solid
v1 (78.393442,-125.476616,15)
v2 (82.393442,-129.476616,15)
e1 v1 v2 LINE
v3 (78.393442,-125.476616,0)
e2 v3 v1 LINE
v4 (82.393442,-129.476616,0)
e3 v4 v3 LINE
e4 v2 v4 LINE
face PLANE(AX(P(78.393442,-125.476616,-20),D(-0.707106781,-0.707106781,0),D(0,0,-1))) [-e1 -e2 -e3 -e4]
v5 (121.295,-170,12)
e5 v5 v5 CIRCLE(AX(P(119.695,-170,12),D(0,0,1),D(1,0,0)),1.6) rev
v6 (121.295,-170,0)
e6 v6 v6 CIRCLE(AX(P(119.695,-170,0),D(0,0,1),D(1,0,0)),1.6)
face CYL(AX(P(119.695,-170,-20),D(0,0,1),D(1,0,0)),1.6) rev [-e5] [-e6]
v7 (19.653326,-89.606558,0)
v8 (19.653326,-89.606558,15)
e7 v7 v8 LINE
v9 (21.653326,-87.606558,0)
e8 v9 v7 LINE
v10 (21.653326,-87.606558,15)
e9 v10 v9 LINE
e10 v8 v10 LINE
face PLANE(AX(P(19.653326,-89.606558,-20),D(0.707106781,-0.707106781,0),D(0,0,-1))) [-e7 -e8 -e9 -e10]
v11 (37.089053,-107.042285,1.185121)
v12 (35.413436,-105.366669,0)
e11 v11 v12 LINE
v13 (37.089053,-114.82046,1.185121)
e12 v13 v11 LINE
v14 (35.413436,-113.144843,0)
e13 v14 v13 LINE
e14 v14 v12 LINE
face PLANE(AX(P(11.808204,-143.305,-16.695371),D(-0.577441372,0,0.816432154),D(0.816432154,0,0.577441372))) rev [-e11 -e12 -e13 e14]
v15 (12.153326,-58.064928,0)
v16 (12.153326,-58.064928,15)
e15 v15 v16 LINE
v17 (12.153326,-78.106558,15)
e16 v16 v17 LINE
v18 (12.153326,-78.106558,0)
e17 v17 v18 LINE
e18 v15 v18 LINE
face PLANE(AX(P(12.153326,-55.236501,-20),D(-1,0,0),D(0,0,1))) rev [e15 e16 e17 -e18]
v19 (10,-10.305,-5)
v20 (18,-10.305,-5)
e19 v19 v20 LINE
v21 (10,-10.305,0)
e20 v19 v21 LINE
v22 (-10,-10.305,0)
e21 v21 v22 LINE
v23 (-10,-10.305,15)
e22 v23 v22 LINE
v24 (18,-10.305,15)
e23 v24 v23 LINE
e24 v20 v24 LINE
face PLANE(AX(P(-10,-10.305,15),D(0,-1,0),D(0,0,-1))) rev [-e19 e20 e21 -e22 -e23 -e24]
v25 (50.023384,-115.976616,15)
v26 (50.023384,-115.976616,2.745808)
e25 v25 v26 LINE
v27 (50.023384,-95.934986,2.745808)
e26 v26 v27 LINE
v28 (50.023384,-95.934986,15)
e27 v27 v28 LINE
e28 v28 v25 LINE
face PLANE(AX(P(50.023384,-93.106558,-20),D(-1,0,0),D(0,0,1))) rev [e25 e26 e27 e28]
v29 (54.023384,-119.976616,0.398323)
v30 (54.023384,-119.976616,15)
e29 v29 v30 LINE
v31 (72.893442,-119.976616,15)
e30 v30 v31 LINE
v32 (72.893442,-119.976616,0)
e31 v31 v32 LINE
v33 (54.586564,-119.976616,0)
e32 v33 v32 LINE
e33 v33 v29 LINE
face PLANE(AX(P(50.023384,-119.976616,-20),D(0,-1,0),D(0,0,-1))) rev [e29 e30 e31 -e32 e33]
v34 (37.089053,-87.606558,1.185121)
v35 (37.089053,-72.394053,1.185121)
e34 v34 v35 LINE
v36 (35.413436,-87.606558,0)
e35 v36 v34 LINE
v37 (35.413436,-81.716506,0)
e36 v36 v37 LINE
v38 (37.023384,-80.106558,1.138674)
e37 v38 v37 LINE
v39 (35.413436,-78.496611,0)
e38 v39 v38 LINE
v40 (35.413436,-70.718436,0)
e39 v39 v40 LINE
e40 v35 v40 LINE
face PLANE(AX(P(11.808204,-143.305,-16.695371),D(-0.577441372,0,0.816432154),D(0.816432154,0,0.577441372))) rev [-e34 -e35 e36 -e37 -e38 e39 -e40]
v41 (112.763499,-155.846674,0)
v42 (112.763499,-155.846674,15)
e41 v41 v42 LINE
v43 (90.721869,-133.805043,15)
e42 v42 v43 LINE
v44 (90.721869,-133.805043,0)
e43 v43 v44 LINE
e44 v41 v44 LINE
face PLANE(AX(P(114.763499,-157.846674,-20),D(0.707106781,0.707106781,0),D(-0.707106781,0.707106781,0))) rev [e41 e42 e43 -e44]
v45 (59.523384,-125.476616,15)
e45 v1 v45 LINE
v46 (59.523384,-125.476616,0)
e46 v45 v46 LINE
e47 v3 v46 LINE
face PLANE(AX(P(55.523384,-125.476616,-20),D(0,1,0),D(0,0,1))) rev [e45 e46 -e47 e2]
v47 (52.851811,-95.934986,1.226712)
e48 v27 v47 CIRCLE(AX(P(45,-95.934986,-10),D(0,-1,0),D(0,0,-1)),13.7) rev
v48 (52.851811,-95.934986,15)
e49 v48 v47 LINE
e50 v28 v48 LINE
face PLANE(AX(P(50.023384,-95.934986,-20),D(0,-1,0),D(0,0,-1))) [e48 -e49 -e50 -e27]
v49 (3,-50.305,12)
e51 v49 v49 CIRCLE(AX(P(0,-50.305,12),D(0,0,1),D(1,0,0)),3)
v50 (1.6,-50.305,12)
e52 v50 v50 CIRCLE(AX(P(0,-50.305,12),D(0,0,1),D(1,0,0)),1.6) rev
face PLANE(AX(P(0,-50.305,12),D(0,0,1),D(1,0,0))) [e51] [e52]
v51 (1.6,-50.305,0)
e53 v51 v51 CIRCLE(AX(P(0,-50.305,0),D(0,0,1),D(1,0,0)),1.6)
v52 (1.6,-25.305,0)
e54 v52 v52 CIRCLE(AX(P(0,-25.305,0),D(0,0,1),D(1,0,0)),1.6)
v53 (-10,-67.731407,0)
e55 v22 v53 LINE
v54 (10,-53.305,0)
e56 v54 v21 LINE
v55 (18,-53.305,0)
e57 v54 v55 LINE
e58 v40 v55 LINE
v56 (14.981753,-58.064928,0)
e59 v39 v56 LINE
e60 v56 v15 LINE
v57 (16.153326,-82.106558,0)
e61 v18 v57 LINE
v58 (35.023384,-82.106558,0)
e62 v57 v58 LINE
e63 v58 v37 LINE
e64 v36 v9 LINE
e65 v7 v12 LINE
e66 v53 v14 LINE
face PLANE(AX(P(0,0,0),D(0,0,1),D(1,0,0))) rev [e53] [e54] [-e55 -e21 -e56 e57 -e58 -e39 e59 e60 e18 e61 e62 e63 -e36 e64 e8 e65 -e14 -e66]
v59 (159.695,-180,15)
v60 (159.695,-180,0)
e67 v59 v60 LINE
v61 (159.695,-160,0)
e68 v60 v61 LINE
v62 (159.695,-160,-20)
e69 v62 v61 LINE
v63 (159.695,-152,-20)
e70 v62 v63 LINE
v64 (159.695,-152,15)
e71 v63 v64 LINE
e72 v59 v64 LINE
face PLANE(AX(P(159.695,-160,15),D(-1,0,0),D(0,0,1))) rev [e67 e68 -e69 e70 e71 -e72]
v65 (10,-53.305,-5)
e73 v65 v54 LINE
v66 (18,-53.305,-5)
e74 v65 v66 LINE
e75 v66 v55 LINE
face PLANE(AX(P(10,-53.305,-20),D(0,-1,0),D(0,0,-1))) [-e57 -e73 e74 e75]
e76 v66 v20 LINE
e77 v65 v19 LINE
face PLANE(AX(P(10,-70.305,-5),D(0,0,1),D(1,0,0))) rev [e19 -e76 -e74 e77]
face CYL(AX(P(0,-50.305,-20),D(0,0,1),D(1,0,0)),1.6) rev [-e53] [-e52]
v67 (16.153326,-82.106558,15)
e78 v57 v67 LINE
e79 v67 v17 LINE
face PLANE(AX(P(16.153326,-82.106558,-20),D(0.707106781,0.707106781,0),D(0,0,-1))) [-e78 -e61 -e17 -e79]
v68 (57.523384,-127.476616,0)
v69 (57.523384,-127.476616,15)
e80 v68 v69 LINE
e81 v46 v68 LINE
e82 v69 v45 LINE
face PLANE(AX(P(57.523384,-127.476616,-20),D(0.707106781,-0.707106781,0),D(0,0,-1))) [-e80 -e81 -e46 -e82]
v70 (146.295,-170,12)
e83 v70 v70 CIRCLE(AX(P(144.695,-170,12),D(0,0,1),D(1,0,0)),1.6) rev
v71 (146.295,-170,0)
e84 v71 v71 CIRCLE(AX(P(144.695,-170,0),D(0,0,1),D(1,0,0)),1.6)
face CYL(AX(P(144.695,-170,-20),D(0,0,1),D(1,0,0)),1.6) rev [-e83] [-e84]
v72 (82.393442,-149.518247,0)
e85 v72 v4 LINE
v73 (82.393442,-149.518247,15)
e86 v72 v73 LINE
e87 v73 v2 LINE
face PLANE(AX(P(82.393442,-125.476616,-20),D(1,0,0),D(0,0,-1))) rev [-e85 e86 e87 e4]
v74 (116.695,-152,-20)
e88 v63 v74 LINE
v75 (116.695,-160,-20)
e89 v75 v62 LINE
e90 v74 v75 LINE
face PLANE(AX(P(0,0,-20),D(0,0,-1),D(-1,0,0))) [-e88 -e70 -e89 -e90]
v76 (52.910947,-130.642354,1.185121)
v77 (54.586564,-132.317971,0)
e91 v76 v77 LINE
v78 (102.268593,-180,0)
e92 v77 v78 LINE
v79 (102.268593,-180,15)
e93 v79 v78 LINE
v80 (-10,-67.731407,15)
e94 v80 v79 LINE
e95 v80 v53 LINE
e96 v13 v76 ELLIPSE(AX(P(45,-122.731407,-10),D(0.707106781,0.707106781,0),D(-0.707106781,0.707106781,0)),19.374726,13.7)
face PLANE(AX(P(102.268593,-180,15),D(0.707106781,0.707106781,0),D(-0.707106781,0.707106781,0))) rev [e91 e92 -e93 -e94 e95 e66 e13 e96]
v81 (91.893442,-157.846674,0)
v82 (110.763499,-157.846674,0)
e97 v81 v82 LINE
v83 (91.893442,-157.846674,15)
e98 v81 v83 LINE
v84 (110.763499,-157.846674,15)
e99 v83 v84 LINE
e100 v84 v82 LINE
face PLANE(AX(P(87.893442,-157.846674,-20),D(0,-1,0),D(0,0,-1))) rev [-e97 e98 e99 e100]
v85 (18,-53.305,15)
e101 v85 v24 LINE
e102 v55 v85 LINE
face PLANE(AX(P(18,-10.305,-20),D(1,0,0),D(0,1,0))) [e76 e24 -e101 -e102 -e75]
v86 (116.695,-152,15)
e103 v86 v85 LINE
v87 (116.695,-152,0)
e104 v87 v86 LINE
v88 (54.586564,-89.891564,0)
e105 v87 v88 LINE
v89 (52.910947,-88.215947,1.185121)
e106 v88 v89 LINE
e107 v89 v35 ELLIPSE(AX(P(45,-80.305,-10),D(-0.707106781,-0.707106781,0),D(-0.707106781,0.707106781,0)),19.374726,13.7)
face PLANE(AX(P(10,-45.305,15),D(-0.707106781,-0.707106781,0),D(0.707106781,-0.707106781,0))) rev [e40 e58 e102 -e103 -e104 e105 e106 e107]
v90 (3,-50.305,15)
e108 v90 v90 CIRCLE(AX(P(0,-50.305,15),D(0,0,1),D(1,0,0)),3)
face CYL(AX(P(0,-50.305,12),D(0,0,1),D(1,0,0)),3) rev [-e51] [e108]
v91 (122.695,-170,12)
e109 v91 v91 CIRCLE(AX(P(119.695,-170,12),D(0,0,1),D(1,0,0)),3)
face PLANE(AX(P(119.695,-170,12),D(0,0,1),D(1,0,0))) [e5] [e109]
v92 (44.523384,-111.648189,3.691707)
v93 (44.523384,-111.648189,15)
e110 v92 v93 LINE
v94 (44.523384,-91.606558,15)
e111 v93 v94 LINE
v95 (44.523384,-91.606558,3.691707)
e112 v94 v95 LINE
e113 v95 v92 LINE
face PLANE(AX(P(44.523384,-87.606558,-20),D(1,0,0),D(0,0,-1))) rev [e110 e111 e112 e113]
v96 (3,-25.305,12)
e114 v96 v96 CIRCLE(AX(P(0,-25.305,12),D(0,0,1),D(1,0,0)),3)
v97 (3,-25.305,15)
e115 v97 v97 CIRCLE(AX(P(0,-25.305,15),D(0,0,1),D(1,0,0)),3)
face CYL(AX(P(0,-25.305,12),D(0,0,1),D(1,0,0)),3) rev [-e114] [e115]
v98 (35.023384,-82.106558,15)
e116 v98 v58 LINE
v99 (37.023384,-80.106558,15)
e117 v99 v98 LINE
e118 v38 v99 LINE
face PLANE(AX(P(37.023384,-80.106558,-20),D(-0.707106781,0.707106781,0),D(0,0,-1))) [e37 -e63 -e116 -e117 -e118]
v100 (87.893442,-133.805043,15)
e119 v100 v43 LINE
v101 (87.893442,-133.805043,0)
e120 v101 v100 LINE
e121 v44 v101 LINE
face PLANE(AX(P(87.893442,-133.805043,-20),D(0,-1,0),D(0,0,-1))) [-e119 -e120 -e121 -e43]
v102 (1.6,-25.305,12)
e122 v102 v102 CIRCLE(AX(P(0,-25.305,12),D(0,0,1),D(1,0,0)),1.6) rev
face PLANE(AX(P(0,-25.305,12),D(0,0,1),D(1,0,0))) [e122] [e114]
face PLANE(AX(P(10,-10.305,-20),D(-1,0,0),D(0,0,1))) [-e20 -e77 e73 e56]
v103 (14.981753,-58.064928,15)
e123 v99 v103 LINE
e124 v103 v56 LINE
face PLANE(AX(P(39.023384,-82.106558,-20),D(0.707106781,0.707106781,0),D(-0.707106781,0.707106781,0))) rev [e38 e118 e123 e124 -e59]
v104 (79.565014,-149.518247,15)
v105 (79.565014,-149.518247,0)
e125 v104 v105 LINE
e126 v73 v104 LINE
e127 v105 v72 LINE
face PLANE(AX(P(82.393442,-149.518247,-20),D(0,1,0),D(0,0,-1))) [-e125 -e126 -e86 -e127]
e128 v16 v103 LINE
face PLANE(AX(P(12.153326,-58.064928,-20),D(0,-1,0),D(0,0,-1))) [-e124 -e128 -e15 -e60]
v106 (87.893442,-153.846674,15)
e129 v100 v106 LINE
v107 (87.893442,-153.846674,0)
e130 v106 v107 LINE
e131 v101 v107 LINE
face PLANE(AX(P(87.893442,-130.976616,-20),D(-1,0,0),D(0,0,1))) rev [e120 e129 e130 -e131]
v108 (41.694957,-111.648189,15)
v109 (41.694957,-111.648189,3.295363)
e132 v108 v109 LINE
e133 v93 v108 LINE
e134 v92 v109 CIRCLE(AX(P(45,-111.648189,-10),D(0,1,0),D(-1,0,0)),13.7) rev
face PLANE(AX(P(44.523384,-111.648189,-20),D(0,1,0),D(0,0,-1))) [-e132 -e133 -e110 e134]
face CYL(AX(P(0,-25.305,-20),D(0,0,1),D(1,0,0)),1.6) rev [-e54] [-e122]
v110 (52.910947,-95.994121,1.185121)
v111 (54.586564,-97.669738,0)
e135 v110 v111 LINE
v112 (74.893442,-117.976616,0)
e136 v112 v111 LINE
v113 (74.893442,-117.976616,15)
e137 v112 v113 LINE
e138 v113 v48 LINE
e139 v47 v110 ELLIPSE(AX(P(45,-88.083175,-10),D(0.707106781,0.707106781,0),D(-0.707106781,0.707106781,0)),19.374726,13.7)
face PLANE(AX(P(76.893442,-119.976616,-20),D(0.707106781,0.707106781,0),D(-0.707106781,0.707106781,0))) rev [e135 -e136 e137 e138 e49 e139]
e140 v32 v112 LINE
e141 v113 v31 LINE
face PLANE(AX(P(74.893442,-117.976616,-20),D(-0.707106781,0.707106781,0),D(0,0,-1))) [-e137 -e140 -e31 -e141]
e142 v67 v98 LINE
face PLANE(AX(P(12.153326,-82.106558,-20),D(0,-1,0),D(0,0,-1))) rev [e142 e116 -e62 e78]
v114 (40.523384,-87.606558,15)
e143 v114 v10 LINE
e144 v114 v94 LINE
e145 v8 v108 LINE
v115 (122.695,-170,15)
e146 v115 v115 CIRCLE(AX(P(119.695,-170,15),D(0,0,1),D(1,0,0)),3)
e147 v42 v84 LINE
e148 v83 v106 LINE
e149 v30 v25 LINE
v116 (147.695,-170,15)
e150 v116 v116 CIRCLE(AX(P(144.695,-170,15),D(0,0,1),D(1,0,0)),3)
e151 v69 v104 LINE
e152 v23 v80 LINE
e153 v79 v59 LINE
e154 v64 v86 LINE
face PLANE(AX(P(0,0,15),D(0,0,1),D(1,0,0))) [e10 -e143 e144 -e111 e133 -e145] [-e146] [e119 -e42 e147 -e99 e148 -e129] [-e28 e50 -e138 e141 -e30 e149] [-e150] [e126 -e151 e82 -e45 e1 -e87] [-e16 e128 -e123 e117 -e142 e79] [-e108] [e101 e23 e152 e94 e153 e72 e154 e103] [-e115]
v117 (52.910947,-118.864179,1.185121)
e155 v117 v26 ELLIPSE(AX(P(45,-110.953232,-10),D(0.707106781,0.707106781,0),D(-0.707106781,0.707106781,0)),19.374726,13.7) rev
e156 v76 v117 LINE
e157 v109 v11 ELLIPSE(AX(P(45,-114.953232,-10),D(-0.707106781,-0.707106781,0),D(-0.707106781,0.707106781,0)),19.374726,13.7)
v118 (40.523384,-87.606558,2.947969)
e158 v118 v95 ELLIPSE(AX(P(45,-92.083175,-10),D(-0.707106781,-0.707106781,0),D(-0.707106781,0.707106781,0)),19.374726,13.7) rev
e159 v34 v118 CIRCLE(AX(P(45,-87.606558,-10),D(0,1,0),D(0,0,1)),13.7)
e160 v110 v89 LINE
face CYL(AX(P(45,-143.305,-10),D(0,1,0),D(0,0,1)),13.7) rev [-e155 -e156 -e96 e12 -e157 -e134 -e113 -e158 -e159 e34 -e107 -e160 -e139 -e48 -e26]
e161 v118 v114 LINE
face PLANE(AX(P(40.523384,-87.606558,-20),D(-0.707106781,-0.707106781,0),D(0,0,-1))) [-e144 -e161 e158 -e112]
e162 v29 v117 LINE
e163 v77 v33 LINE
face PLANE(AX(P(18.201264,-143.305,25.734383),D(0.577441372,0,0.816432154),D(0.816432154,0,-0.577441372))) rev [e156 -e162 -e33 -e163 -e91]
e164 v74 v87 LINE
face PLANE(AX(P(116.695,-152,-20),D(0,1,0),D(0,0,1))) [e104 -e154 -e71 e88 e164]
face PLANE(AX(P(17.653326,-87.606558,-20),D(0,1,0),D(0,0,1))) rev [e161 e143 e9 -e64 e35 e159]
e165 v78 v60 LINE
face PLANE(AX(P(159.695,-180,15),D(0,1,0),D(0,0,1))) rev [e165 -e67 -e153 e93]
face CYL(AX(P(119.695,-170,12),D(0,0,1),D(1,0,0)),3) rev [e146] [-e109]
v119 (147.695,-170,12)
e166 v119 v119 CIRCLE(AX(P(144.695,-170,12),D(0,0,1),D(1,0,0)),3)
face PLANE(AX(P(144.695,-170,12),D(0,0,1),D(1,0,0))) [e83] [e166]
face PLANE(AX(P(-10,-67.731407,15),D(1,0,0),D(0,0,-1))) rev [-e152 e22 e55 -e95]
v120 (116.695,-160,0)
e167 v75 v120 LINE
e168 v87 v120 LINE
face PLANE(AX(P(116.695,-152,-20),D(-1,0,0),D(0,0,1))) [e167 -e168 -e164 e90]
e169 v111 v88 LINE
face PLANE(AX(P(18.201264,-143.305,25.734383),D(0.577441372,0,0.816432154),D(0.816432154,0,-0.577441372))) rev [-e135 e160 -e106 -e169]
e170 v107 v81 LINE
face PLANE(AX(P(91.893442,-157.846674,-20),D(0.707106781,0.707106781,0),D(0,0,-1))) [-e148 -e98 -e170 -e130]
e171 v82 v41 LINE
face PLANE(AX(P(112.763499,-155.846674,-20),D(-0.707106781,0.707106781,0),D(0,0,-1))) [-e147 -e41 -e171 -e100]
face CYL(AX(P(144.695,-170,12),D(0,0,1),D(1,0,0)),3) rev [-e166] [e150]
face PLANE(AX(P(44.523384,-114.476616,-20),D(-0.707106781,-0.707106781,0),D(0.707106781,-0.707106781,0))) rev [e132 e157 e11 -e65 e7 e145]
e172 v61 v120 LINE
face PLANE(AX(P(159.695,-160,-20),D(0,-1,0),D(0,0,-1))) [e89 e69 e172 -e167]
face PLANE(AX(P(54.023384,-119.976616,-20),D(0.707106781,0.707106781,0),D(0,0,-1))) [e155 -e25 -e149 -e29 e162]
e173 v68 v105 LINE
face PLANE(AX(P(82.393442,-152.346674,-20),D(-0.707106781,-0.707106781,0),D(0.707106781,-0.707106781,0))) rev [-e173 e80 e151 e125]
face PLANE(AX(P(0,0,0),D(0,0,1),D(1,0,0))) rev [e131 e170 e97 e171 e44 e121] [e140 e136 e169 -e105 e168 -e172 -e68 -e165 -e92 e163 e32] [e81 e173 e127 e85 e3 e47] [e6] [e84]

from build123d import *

# Parameters (mm, degrees)
EXTRUDE_1_DEPTH     = 15
SKETCH_3_W          = 43
SKETCH_3_H          = 8
EXTRUDE_2_DEPTH     = 35
SKETCH_4_W          = 8
SKETCH_4_H          = 43
EXTRUDE_3_DEPTH     = 35
CUT_EXTRUDE_1_DEPTH = 244.161454645
SKETCH_6_R          = 1.6
CUT_EXTRUDE_2_DEPTH = 244.161454645
SKETCH_7_R          = 3
CUT_EXTRUDE_3_DEPTH = 3
CHAMFER_1_SIZE      = 2.828427125
CHAMFER_1_SIZE_2    = 4
CUT_EXTRUDE_4_DEPTH = 133
SKETCH_10_W         = 8
SKETCH_10_H         = 15
CUT_EXTRUDE_5_DEPTH = 43


with BuildPart() as part:
    # 草图1 → 凸台-拉伸1 (new body)
    with BuildSketch(Plane.XY):
        Polygon((124.695, -160), (159.695, -160), (159.695, -180), (102.268593129, -180), (-10, -67.731406871), (-10, -10.305), (10, -10.305), (10, -45.305), align=None)
    extrude(amount=EXTRUDE_1_DEPTH)

    # 草图3 → 凸台-拉伸2 (add)
    with BuildSketch(Plane.XY.offset(15)):
        with Locations((138.195, -156)):
            Rectangle(SKETCH_3_W, SKETCH_3_H)
    extrude(amount=-EXTRUDE_2_DEPTH)

    # 草图4 → 凸台-拉伸3 (add)
    with BuildSketch(Plane.XY.offset(15)):
        with Locations((14, -31.805)):
            Rectangle(SKETCH_4_W, SKETCH_4_H)
    extrude(amount=-EXTRUDE_3_DEPTH)

    # 草图5 → 切除-拉伸1 (cut, through all)
    with BuildSketch(Plane.XY.offset(15)):
        Polygon((50.023383861, -93.106558454), (50.023383861, -119.976616139), (76.893441546, -119.976616139), align=None)
        Polygon((55.523383861, -125.476616139), (82.393441546, -125.476616139), (82.393441546, -152.346673824), align=None)
        Polygon((12.153326176, -55.236500769), (12.153326176, -82.106558454), (39.023383861, -82.106558454), align=None)
        Polygon((87.893441546, -130.976616139), (87.893441546, -157.846673824), (114.763499231, -157.846673824), align=None)
        Polygon((17.653326176, -87.606558454), (44.523383861, -87.606558454), (44.523383861, -114.476616139), align=None)
    extrude(amount=-CUT_EXTRUDE_1_DEPTH, mode=Mode.SUBTRACT)

    # 草图6 → 切除-拉伸2 (cut, through all)
    with BuildSketch(Plane.XY.offset(15)):
        with Locations((0, -50.305)):
            Circle(SKETCH_6_R)
        with Locations((0, -25.305)):
            Circle(SKETCH_6_R)
        with Locations((119.695, -170)):
            Circle(SKETCH_6_R)
        with Locations((144.695, -170)):
            Circle(SKETCH_6_R)
    extrude(amount=-CUT_EXTRUDE_2_DEPTH, mode=Mode.SUBTRACT)

    # 草图7 → 切除-拉伸3 (cut)
    with BuildSketch(Plane.XY.offset(15)):
        with Locations((0, -25.305)):
            Circle(SKETCH_7_R)
        with Locations((0, -50.305)):
            Circle(SKETCH_7_R)
        with Locations((119.695, -170)):
            Circle(SKETCH_7_R)
        with Locations((144.695, -170)):
            Circle(SKETCH_7_R)
    extrude(amount=-CUT_EXTRUDE_3_DEPTH, mode=Mode.SUBTRACT)

    # 倒角1
    # the kernel refuses this chamfer: 4, 2.828427125 mm, written as the material it adds along each edge
    with BuildSketch(Plane(origin=(82.393441546, -152.346673824, 15), x_dir=(0.05647824947248942, 0.9984038297885898, 0), z_dir=(0, 0, -1)), Plane(origin=(55.523383861, -125.476616139, 15), x_dir=(0.6660419652145875, -0.7459142715976752, 0), z_dir=(0, 0, -1)), Plane(origin=(87.893441546, -130.976616139, 15), x_dir=(-0.05647824947248942, -0.9984038297885898, 0), z_dir=(0, 0, -1)), Plane(origin=(12.153326176, -55.236500769, 15), x_dir=(-0.05647824947249038, -0.9984038297885897, 0), z_dir=(0, 0, -1)), Plane(origin=(44.523383861, -114.476616139, 15), x_dir=(0.05647824947248914, 0.9984038297885898, 0), z_dir=(0, 0, -1)), Plane(origin=(17.653326176, -87.606558454, 15), x_dir=(0.6660419652145882, -0.7459142715976745, 0), z_dir=(0, 0, -1)), Plane(origin=(50.023383861, -93.106558454, 15), x_dir=(-0.05647824947248914, -0.9984038297885898, 0), z_dir=(0, 0, -1))) as chamfer_1_piece_1:
        Polygon((CHAMFER_1_SIZE * 0.998403829699, -CHAMFER_1_SIZE * 0.0564782494674), (CHAMFER_1_SIZE_2 * 0.666041965215, -CHAMFER_1_SIZE_2 * 0.745914271598), (0, 0), align=None)
    extrude(amount=15)
    with BuildSketch(Plane(origin=(82.393441546, -125.476616139, 15), x_dir=(0.02749587661058555, -0.9996219169112968, 0), z_dir=(0, 0, -1)), Plane(origin=(87.893441546, -157.846673824, 15), x_dir=(-0.02749587661058555, 0.9996219169112968, 0), z_dir=(0, 0, -1)), Plane(origin=(12.153326176, -82.106558454, 15), x_dir=(-0.02749587661058651, 0.9996219169112968, 0), z_dir=(0, 0, -1)), Plane(origin=(44.523383861, -87.606558454, 15), x_dir=(0.027495876610585647, -0.9996219169112968, 0), z_dir=(0, 0, -1)), Plane(origin=(50.023383861, -119.976616139, 15), x_dir=(-0.027495876610585647, 0.9996219169112968, 0), z_dir=(0, 0, -1))) as chamfer_1_piece_2:
        Polygon((CHAMFER_1_SIZE_2 * 0.999621916911, CHAMFER_1_SIZE_2 * 0.0274958766106), (-CHAMFER_1_SIZE_2 * 0.0274958766106, CHAMFER_1_SIZE_2 * 0.999621916911), (0, 0), align=None)
    extrude(amount=15)
    with BuildSketch(Plane(origin=(114.763499231, -157.846673824, 15), x_dir=(-0.9996219169112968, -0.0274958766105891, 0), z_dir=(0, 0, -1)), Plane(origin=(39.023383861, -82.106558454, 15), x_dir=(-0.9996219169112968, -0.027495876610585647, 0), z_dir=(0, 0, -1)), Plane(origin=(76.893441546, -119.976616139, 15), x_dir=(-0.9996219169112968, -0.027495876610585647, 0), z_dir=(0, 0, -1))) as chamfer_1_piece_3:
        Polygon((CHAMFER_1_SIZE_2 * 0.999621916911, CHAMFER_1_SIZE_2 * 0.0274958766106), (CHAMFER_1_SIZE * 0.687396915203, CHAMFER_1_SIZE * 0.726281956812), (0, 0), align=None)
    extrude(amount=15)

    # 草图9 → 切除-拉伸4 (cut)
    with BuildSketch(Plane(origin=(0, -10.305, 0), x_dir=(1, 0, 0), z_dir=(0, 1, 0))):
        with BuildLine():
            Line((54.586563641, 0), (35.413436359, 0))
            Line((35.413436359, 0), (37.089053206, -1.18512051))
            ThreePointArc((37.089053206, -1.18512051), (45, -3.7), (52.910946794, -1.18512051))
            Line((52.910946794, -1.18512051), (54.586563641, 0))
        make_face()
    extrude(amount=-CUT_EXTRUDE_4_DEPTH, mode=Mode.SUBTRACT)

    # 草图10 → 切除-拉伸5 (cut)
    with BuildSketch(Plane(origin=(0, -10.305, 0), x_dir=(1, 0, 0), z_dir=(0, 1, 0))):
        with Locations((14, 12.5)):
            Rectangle(SKETCH_10_W, SKETCH_10_H)
    extrude(amount=-CUT_EXTRUDE_5_DEPTH, mode=Mode.SUBTRACT)


solid = part.part
